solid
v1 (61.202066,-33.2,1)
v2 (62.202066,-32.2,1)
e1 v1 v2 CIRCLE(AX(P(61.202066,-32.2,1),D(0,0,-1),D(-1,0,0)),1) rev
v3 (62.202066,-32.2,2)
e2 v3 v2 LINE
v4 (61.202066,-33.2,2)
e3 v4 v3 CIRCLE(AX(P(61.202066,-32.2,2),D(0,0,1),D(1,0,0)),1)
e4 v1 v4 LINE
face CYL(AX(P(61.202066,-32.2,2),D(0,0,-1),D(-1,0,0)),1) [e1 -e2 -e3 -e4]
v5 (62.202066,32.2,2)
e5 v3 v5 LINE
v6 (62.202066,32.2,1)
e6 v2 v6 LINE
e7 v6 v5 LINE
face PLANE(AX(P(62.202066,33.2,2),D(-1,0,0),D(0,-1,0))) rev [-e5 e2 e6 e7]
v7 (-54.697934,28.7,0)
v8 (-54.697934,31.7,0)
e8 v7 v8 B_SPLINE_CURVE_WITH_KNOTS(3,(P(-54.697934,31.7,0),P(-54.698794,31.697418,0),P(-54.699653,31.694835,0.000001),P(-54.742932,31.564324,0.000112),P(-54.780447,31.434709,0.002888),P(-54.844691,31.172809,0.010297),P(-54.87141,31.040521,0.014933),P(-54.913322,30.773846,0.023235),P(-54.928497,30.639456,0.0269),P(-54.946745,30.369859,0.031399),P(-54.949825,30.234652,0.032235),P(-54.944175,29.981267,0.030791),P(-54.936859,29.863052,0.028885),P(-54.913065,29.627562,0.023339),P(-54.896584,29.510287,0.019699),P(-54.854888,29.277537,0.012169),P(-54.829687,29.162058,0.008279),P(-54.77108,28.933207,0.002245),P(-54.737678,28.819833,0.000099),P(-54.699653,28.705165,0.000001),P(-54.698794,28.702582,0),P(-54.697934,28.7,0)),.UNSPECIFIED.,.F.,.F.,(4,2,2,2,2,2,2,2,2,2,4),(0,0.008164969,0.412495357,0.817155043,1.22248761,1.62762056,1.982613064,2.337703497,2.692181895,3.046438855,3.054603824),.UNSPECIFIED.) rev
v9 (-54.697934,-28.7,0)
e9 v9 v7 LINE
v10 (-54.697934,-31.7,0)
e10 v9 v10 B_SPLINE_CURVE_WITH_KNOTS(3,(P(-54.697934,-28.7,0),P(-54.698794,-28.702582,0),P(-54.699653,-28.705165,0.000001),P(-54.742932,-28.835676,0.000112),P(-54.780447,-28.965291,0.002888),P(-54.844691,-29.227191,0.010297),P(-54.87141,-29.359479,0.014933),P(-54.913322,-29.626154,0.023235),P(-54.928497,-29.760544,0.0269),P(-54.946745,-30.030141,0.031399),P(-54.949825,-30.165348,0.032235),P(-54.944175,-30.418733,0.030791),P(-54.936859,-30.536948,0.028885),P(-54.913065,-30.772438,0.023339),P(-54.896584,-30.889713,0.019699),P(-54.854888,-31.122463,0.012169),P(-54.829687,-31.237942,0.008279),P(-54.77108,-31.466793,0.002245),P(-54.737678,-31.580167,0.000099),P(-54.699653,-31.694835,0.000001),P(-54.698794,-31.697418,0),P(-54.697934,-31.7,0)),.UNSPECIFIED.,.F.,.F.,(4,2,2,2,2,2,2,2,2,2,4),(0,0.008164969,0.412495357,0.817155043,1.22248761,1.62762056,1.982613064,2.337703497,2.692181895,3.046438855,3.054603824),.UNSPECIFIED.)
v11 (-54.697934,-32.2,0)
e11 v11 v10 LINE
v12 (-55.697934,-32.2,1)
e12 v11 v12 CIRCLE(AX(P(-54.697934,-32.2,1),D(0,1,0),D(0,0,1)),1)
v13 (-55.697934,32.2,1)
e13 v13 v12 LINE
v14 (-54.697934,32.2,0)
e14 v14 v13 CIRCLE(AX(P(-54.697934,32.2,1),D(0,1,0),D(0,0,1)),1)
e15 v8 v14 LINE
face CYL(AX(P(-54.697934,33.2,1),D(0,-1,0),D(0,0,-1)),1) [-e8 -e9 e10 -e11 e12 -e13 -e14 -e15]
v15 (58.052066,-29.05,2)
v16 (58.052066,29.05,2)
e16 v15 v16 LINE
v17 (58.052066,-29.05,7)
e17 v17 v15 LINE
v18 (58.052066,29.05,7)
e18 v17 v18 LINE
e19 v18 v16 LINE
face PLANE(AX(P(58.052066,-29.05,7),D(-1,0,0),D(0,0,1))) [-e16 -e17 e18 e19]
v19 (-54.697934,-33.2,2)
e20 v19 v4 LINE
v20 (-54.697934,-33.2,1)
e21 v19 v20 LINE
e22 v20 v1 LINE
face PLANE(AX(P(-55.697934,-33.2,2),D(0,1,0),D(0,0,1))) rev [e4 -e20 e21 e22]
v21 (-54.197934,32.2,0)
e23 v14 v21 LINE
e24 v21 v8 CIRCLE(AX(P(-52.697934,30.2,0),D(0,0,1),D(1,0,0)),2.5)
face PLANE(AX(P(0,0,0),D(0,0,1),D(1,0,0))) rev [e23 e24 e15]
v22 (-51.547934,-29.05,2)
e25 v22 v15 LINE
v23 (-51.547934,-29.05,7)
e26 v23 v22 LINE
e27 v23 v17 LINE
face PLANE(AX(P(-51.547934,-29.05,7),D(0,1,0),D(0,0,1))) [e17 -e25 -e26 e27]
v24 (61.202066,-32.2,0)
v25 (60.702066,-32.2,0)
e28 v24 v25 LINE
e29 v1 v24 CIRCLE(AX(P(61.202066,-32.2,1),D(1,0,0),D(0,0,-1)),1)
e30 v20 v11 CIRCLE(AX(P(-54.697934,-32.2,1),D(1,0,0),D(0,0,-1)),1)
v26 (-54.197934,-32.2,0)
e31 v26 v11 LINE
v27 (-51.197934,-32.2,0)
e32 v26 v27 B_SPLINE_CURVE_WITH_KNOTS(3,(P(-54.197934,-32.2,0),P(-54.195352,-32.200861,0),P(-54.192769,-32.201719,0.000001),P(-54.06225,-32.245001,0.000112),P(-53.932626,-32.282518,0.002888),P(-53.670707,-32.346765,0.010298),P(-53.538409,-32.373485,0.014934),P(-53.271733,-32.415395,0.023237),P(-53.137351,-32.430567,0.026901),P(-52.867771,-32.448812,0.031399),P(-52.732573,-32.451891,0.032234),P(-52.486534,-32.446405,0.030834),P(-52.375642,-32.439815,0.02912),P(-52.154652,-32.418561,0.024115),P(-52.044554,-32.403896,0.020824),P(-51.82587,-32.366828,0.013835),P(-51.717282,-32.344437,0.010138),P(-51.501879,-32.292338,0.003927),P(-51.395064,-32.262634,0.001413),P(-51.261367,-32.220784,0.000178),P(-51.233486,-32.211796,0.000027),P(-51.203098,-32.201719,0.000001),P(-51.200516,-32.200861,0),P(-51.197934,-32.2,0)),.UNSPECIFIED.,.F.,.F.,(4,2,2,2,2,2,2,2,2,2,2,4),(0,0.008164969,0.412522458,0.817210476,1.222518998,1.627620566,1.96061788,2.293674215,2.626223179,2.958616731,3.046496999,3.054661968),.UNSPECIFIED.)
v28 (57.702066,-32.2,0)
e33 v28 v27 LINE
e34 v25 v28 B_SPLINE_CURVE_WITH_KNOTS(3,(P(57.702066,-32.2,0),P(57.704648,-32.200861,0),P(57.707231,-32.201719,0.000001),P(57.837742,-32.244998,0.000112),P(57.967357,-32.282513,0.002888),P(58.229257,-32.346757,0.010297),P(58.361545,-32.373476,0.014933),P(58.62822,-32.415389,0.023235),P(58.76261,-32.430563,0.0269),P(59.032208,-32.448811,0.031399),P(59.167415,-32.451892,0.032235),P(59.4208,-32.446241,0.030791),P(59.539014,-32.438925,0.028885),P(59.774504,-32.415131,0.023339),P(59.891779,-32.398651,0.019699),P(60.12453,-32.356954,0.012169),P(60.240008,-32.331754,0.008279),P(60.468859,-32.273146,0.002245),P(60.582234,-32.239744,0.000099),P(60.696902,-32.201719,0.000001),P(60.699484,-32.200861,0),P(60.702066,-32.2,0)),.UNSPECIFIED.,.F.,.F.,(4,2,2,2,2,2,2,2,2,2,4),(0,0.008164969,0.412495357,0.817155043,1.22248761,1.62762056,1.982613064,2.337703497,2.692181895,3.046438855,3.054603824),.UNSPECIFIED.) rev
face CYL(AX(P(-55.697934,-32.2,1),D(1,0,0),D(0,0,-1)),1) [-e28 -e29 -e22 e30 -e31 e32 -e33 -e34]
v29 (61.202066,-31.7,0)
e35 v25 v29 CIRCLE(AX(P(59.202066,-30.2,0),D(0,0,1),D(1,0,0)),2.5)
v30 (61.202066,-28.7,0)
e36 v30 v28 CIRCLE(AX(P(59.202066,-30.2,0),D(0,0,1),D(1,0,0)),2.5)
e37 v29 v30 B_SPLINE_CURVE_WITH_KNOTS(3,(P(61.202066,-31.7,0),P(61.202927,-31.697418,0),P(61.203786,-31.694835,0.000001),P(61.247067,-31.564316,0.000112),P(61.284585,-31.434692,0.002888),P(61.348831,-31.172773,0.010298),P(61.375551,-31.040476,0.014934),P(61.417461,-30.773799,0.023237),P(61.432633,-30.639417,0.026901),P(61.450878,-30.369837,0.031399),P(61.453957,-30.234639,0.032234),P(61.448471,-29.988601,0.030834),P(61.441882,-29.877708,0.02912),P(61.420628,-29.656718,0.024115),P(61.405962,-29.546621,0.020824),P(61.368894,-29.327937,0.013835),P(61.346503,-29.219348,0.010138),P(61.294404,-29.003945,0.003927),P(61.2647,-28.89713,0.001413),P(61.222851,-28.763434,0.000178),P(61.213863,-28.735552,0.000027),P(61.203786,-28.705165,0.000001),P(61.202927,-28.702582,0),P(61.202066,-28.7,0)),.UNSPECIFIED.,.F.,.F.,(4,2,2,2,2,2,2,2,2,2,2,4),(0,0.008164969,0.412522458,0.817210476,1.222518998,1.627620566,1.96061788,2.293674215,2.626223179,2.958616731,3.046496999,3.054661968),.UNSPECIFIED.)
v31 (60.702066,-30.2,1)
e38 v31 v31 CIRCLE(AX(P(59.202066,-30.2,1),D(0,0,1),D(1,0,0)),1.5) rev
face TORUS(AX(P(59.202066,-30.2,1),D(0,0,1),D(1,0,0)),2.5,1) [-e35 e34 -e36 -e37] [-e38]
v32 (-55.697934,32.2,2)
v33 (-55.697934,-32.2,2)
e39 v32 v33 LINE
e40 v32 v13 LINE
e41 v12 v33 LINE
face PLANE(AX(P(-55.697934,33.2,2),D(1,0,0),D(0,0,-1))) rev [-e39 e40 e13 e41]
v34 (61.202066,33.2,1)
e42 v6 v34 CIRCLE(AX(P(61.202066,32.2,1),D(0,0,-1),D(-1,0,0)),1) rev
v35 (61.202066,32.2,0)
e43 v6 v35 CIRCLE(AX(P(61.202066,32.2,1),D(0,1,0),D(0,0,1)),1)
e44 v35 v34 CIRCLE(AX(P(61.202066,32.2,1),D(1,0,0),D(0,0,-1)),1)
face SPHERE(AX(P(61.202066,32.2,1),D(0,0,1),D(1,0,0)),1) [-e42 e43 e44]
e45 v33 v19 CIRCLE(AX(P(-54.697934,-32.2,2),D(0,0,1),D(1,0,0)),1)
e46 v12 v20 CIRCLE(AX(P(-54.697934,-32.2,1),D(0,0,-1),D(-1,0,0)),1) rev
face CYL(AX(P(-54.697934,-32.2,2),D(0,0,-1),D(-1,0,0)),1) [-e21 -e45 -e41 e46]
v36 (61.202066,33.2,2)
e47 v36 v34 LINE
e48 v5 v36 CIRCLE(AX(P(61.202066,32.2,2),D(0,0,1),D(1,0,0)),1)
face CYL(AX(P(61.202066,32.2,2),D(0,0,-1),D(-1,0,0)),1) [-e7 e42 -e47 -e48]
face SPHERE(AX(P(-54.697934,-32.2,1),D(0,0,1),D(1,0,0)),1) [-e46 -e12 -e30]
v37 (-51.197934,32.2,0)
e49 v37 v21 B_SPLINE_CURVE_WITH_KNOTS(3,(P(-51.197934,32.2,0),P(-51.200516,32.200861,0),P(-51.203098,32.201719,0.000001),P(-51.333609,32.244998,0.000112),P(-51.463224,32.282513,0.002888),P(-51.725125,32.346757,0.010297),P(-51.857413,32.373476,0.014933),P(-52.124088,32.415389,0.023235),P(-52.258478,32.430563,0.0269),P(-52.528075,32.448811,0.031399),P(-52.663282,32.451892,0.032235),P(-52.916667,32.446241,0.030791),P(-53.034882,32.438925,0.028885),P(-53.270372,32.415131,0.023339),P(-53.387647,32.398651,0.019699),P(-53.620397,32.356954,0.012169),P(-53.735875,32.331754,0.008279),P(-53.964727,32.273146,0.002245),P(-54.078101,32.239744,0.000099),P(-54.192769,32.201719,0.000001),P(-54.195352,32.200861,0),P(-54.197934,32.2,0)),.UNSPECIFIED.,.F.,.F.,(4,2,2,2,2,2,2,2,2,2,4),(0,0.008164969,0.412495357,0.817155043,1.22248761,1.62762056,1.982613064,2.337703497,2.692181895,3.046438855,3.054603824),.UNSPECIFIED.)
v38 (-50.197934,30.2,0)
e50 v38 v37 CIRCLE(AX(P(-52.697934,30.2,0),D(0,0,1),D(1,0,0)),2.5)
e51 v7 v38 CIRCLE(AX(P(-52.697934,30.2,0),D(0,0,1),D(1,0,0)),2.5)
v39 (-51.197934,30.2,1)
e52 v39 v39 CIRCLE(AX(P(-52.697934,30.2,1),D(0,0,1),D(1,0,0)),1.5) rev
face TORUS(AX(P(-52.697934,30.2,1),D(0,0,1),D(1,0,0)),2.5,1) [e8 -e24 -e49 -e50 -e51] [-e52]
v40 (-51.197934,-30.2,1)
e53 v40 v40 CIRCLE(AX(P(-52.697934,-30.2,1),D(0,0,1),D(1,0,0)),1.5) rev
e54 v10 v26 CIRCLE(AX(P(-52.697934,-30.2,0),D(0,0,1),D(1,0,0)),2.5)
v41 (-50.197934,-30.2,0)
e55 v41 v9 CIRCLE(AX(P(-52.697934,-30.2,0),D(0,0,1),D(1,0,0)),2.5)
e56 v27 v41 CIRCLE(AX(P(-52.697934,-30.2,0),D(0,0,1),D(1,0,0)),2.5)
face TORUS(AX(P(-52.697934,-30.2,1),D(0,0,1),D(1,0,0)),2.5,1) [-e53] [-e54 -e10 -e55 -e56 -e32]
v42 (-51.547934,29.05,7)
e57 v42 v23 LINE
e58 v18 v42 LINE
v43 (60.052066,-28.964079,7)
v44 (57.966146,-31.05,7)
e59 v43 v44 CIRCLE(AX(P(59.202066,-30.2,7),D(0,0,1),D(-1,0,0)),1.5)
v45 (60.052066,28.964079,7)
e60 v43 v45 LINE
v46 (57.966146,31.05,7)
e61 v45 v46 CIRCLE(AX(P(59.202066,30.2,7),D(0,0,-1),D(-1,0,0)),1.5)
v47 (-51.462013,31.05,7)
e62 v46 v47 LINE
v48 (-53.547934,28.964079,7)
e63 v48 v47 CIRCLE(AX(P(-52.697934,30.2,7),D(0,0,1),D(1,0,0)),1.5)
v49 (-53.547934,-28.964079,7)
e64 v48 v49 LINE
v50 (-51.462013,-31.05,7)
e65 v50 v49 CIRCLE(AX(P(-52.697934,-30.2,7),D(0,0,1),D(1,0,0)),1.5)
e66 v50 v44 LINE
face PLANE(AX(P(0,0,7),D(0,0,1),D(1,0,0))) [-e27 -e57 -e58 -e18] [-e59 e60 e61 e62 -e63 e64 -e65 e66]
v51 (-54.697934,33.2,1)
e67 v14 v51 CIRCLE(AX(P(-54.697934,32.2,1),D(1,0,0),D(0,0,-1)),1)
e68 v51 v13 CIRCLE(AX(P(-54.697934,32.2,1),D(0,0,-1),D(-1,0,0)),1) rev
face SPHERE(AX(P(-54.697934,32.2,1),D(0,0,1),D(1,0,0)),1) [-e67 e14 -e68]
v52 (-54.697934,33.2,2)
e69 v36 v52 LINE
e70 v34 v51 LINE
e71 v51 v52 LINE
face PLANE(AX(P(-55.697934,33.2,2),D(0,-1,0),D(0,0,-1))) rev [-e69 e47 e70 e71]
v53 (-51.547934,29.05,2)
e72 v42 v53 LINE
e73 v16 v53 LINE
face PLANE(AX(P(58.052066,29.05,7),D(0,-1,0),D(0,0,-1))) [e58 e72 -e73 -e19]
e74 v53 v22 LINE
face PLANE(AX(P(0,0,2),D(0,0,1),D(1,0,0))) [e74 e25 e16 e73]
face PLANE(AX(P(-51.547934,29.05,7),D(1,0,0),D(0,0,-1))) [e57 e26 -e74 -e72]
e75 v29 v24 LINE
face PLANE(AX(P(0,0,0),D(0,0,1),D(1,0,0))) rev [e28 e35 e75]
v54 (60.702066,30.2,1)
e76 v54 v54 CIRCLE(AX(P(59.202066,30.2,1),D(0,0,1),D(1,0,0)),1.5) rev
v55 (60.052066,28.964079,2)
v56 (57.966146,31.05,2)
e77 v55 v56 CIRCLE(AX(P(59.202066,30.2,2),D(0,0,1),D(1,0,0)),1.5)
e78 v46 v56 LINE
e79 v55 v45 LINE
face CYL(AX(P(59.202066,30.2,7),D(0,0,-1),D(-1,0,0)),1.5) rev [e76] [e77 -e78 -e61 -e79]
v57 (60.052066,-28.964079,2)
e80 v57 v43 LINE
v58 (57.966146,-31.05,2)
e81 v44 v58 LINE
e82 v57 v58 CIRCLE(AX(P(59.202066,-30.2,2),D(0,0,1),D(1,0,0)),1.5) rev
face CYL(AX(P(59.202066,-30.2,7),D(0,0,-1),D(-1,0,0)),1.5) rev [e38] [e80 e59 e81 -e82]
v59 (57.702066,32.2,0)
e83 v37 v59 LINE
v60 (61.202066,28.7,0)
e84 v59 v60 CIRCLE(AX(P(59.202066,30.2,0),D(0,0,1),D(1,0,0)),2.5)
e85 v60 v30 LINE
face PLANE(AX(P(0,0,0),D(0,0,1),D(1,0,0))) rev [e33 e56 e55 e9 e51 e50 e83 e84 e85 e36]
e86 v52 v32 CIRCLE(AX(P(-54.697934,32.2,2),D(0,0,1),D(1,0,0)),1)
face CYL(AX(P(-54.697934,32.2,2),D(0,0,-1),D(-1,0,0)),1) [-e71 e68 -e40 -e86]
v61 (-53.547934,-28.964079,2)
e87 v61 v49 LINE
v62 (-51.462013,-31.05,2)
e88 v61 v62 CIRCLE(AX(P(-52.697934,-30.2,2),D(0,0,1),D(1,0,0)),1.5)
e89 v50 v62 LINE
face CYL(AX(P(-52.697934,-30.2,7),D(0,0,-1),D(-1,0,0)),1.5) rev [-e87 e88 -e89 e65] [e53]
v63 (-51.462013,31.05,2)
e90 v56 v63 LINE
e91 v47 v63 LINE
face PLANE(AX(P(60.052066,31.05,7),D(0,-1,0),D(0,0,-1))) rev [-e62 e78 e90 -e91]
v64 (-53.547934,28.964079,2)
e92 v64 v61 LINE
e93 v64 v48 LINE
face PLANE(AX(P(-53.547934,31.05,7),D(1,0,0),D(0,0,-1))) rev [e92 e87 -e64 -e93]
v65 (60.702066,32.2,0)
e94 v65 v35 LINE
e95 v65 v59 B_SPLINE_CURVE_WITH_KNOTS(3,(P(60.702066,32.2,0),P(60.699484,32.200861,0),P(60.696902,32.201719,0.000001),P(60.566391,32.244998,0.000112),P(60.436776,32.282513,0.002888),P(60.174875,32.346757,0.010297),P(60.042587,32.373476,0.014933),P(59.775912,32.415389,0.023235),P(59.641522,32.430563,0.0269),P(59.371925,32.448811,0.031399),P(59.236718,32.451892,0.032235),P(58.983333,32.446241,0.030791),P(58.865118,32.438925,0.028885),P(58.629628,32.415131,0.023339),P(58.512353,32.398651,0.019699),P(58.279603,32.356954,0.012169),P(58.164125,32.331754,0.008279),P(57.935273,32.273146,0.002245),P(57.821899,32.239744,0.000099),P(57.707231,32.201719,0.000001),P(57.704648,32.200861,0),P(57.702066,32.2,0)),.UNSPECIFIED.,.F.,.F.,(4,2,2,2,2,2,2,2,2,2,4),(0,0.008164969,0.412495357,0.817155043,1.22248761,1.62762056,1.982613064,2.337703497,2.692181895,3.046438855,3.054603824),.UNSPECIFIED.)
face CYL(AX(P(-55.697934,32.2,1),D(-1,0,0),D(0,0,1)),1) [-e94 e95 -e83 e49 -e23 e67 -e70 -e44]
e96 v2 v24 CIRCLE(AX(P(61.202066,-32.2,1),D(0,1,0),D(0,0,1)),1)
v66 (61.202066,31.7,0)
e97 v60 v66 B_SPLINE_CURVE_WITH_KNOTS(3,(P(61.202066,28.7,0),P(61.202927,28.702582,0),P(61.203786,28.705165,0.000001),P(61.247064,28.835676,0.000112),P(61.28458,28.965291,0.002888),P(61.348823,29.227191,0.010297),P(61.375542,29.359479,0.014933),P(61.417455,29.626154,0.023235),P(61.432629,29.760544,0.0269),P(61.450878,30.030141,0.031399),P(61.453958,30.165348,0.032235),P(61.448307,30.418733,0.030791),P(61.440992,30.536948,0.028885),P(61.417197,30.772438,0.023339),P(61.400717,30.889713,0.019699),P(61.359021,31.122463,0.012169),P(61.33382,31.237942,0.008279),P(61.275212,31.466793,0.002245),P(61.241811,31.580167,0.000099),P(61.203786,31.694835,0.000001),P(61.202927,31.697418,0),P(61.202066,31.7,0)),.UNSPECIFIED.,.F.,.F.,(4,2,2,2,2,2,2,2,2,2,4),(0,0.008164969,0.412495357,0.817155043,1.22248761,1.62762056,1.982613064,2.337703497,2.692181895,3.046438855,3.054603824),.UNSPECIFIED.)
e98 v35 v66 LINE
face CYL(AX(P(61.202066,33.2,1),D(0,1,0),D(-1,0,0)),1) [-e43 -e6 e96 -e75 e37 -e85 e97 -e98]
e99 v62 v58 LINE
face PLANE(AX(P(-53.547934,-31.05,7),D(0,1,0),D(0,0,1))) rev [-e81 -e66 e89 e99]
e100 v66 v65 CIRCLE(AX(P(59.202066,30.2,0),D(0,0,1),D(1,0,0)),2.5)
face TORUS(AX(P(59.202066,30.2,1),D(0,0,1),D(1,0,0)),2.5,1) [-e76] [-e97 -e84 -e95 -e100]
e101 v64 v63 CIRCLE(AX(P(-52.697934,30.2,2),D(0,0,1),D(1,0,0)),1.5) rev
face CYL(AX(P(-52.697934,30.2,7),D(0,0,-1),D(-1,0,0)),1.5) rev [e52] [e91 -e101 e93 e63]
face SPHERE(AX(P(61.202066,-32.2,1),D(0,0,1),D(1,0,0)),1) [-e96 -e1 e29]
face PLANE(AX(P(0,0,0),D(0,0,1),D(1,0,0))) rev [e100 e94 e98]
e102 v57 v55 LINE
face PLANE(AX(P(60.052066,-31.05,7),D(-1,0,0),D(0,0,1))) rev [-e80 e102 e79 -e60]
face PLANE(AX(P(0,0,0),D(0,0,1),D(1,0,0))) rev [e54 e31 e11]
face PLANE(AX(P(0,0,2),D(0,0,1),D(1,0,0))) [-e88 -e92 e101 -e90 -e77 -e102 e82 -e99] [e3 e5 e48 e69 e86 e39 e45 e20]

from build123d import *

# Parameters (mm, degrees)
BOSS_EXTRUDE1_DEPTH                        = 2
SKETCH2_W                                  = 113.60000000000001
SKETCH2_H                                  = 62.1
SKETCH2_W_2                                = 109.60000000000001
SKETCH2_H_2                                = 58.1
BOSS_EXTRUDE2_DEPTH                        = 5
SKETCH3_R                                  = 1.5000000000000042
CUT_EXTRUDE2_DEPTH                         = 71.85433681838424
MIRROR3_AT_THE_SECOND_PLANE_COPY_1_SKETC_R = 1.5000000000000042
MIRROR3_AT_THE_SECOND_PLANE_COPY_1_DEPTH   = 71.85433681838424
FILLET1_R                                  = 1
FILLET2_R                                  = 1


with BuildPart() as part:
    # Sketch1 → Boss-Extrude1 (new body)
    with BuildSketch(Plane.XY):
        Polygon((-55.697933748362985, 33.2), (62.20206625163701, 33.2), (62.202066251637014, -33.2), (-55.697933748362985, -33.2), align=None)
    extrude(amount=BOSS_EXTRUDE1_DEPTH)

    # Sketch2 → Boss-Extrude2 (add)
    with BuildSketch(Plane.XY.offset(2)):
        with Locations((3.252066251637011, 0)):
            Rectangle(SKETCH2_W, SKETCH2_H)
        with Locations((3.252066251637011, 0)):
            Rectangle(SKETCH2_W_2, SKETCH2_H_2, mode=Mode.SUBTRACT)
    extrude(amount=BOSS_EXTRUDE2_DEPTH)

    # Sketch3 → Cut-Extrude2 (cut, symmetric)
    with BuildSketch(Plane(origin=(0, 0, 0), x_dir=(-1, 0, 0), z_dir=(0, 0, -1))):
        with Locations(Location((-59.202066251637, 30.200000000000003, 0), (0, 0, 34.518107841))):
            Circle(SKETCH3_R)
    cut_extrude2 = extrude(amount=CUT_EXTRUDE2_DEPTH, both=True, mode=Mode.SUBTRACT)

    # Mirror2: Cut-Extrude2 across plane
    add(cut_extrude2.mirror(Plane.ZX), mode=Mode.SUBTRACT)

    # Mirror3: Cut-Extrude2 across plane
    add(cut_extrude2.mirror(Plane.ZX), mode=Mode.SUBTRACT)

    # Mirror3 at the second plane: Cut-Extrude2 across plane
    add(cut_extrude2.mirror(Plane(origin=(3.2520662516370114, 0, 0), x_dir=(0, 0, 1), z_dir=(1, 0, 0))), mode=Mode.SUBTRACT)

    # Mirror3 at the second plane copy 1 sketc → Mirror3 at the second plane copy 1 (cut, symmetric)
    with BuildSketch(Plane(origin=(6.504132503274023, 0, 0), x_dir=(1, 0, 0), z_dir=(0, 0, -1))):
        with Locations(Location((-59.202066251637, 30.200000000000003, 0), (0, 0, 34.518107841))):
            Circle(MIRROR3_AT_THE_SECOND_PLANE_COPY_1_SKETC_R)
    extrude(amount=MIRROR3_AT_THE_SECOND_PLANE_COPY_1_DEPTH, both=True, mode=Mode.SUBTRACT)

    # Fillet1
    fillet1_edges = [part.edges().sort_by_distance(p)[0] for p in [
        (62.202066251637014, -33.2, 1),
        (-55.697933748362985, -33.2, 1),
        (-55.697933748362985, 33.2, 1),
        (62.20206625163701, 33.2, 1),
    ]]
    fillet(fillet1_edges, radius=FILLET1_R)

    # Fillet2
    # the kernel refuses this fillet: 1 mm, written as the material it takes off along each edge
    with BuildSketch(Plane(origin=(62.20206625163701, 32.2, 0), x_dir=(-1, -1.1e-16, 0), z_dir=(1.1e-16, -1, 0)), Plane(origin=(-55.697933748362985, -32.2, 0), x_dir=(1, 0, 0), z_dir=(0, 1, 0))) as fillet2_piece_1:
        with BuildLine():
            CenterArc((FILLET2_R, -FILLET2_R), FILLET2_R, 90, 90)
            Line((0, -FILLET2_R), (0, 0))
            Line((0, 0), (FILLET2_R, 0))
        make_face()
    extrude(amount=64.4, mode=Mode.SUBTRACT)
    with BuildSketch(Plane(origin=(61.202066251637014, -33.2, 0), x_dir=(0, 1, 0), z_dir=(-1, 0, 0))) as fillet2_piece_2:
        with BuildLine():
            CenterArc((FILLET2_R, -FILLET2_R), FILLET2_R, 90, 90)
            Line((0, -FILLET2_R), (0, 0))
            Line((0, 0), (FILLET2_R, 0))
        make_face()
    extrude(amount=115.9, mode=Mode.SUBTRACT)
    with BuildSketch(Plane(origin=(-54.697933748362985, 33.2, 0), x_dir=(0, 0, 1), z_dir=(1, 0, 0))) as fillet2_piece_3:
        with BuildLine():
            CenterArc((FILLET2_R, FILLET2_R), FILLET2_R, 180, 90)
            Line((-1.1e-16, FILLET2_R), (0, 0))
            Line((0, 0), (FILLET2_R, 0))
        make_face()
    extrude(amount=115.89999999999999, mode=Mode.SUBTRACT)
    with BuildSketch(Plane(origin=(-54.697933748362985, -32.2, 0), x_dir=(-1, 0, 0), z_dir=(0, 1, 0))) as fillet2_piece_4:
        with BuildLine():
            CenterArc((1 - FILLET2_R, FILLET2_R), FILLET2_R, 270, 90)
            Line((1, FILLET2_R), (1, 0))
            Line((1, 0), (1 - FILLET2_R, 0))
        make_face()
    revolve(axis=Axis((-54.697933748362985, -32.2, 0), (0, 0, 1)), revolution_arc=90, mode=Mode.SUBTRACT)
    with BuildSketch(Plane(origin=(-54.697933748362985, 32.2, 0), x_dir=(0, 1, 0), z_dir=(1, 0, 0))) as fillet2_piece_5:
        with BuildLine():
            CenterArc((1 - FILLET2_R, FILLET2_R), FILLET2_R, 270, 90)
            Line((1, FILLET2_R), (1, 0))
            Line((1, 0), (1 - FILLET2_R, 0))
        make_face()
    revolve(axis=Axis((-54.697933748362985, 32.2, 0), (0, 0, 1)), revolution_arc=90, mode=Mode.SUBTRACT)
    with BuildSketch(Plane(origin=(61.20206625163701, 32.2, 0), x_dir=(0, 1, 0), z_dir=(-1, 0, 0))) as fillet2_piece_6:
        with BuildLine():
            CenterArc((1 - FILLET2_R, -FILLET2_R), FILLET2_R, 6.36e-15, 90)
            Line((1, -FILLET2_R), (1, 0))
            Line((1, 0), (1 - FILLET2_R, 0))
        make_face()
    revolve(axis=Axis((61.20206625163701, 32.2, 0), (0, 0, -1)), revolution_arc=90, mode=Mode.SUBTRACT)
    with BuildSketch(Plane(origin=(61.202066251637014, -32.2, 0), x_dir=(1, 0, 0), z_dir=(0, 1, 0))) as fillet2_piece_7:
        with BuildLine():
            CenterArc((1 - FILLET2_R, -FILLET2_R), FILLET2_R, 6.36e-15, 90)
            Line((1, -FILLET2_R), (1, 0))
            Line((1, 0), (1 - FILLET2_R, 0))
        make_face()
    revolve(axis=Axis((61.202066251637014, -32.2, 0), (0, 0, -1)), revolution_arc=90, mode=Mode.SUBTRACT)
    with BuildSketch(Plane(origin=(59.202066251637, 30.200000000000003, 0), x_dir=(-0.8239471396211576, 0.5666666666657856, 0), z_dir=(-0.5666666666657856, -0.8239471396211576, 0))) as fillet2_piece_8:
        with BuildLine():
            CenterArc((1.5000000000000024 + FILLET2_R, -FILLET2_R), FILLET2_R, 90, 90)
            Line((1.5000000000000024, -FILLET2_R), (1.5000000000000024, 0))
            Line((1.5000000000000024, 0), (1.5000000000000024 + FILLET2_R, 0))
        make_face()
    revolve(axis=Axis((59.202066251637, 30.200000000000003, 0), (0, 0, -1)), mode=Mode.SUBTRACT)
    with BuildSketch(Plane(origin=(59.202066251637, -30.200000000000003, 0), x_dir=(-0.8239471396211576, -0.5666666666657856, 0), z_dir=(0.5666666666657856, -0.8239471396211576, 0))) as fillet2_piece_9:
        with BuildLine():
            CenterArc((1.5000000000000024 + FILLET2_R, -FILLET2_R), FILLET2_R, 90, 90)
            Line((1.5000000000000024, -FILLET2_R), (1.5000000000000024, 0))
            Line((1.5000000000000024, 0), (1.5000000000000024 + FILLET2_R, 0))
        make_face()
    revolve(axis=Axis((59.202066251637, -30.200000000000003, 0), (0, 0, -1)), mode=Mode.SUBTRACT)
    with BuildSketch(Plane(origin=(-52.69793374836298, 30.200000000000003, 0), x_dir=(0.8239471396211576, 0.5666666666657856, 0), z_dir=(-0.5666666666657856, 0.8239471396211576, 0))) as fillet2_piece_10:
        with BuildLine():
            CenterArc((1.5000000000000024 + FILLET2_R, -FILLET2_R), FILLET2_R, 90, 90)
            Line((1.5000000000000062, -FILLET2_R), (1.5000000000000024, 0))
            Line((1.5000000000000024, 0), (1.5000000000000024 + FILLET2_R, 0))
        make_face()
    revolve(axis=Axis((-52.69793374836298, 30.200000000000003, 0), (0, 0, -1)), mode=Mode.SUBTRACT)
    with BuildSketch(Plane(origin=(-52.69793374836298, -30.200000000000003, 0), x_dir=(0.8239471396211576, -0.5666666666657856, 0), z_dir=(0.5666666666657856, 0.8239471396211576, 0))) as fillet2_piece_11:
        with BuildLine():
            CenterArc((1.5000000000000024 + FILLET2_R, -FILLET2_R), FILLET2_R, 90, 90)
            Line((1.5000000000000062, -FILLET2_R), (1.5000000000000024, 0))
            Line((1.5000000000000024, 0), (1.5000000000000024 + FILLET2_R, 0))
        make_face()
    revolve(axis=Axis((-52.69793374836298, -30.200000000000003, 0), (0, 0, -1)), mode=Mode.SUBTRACT)


solid = part.part
